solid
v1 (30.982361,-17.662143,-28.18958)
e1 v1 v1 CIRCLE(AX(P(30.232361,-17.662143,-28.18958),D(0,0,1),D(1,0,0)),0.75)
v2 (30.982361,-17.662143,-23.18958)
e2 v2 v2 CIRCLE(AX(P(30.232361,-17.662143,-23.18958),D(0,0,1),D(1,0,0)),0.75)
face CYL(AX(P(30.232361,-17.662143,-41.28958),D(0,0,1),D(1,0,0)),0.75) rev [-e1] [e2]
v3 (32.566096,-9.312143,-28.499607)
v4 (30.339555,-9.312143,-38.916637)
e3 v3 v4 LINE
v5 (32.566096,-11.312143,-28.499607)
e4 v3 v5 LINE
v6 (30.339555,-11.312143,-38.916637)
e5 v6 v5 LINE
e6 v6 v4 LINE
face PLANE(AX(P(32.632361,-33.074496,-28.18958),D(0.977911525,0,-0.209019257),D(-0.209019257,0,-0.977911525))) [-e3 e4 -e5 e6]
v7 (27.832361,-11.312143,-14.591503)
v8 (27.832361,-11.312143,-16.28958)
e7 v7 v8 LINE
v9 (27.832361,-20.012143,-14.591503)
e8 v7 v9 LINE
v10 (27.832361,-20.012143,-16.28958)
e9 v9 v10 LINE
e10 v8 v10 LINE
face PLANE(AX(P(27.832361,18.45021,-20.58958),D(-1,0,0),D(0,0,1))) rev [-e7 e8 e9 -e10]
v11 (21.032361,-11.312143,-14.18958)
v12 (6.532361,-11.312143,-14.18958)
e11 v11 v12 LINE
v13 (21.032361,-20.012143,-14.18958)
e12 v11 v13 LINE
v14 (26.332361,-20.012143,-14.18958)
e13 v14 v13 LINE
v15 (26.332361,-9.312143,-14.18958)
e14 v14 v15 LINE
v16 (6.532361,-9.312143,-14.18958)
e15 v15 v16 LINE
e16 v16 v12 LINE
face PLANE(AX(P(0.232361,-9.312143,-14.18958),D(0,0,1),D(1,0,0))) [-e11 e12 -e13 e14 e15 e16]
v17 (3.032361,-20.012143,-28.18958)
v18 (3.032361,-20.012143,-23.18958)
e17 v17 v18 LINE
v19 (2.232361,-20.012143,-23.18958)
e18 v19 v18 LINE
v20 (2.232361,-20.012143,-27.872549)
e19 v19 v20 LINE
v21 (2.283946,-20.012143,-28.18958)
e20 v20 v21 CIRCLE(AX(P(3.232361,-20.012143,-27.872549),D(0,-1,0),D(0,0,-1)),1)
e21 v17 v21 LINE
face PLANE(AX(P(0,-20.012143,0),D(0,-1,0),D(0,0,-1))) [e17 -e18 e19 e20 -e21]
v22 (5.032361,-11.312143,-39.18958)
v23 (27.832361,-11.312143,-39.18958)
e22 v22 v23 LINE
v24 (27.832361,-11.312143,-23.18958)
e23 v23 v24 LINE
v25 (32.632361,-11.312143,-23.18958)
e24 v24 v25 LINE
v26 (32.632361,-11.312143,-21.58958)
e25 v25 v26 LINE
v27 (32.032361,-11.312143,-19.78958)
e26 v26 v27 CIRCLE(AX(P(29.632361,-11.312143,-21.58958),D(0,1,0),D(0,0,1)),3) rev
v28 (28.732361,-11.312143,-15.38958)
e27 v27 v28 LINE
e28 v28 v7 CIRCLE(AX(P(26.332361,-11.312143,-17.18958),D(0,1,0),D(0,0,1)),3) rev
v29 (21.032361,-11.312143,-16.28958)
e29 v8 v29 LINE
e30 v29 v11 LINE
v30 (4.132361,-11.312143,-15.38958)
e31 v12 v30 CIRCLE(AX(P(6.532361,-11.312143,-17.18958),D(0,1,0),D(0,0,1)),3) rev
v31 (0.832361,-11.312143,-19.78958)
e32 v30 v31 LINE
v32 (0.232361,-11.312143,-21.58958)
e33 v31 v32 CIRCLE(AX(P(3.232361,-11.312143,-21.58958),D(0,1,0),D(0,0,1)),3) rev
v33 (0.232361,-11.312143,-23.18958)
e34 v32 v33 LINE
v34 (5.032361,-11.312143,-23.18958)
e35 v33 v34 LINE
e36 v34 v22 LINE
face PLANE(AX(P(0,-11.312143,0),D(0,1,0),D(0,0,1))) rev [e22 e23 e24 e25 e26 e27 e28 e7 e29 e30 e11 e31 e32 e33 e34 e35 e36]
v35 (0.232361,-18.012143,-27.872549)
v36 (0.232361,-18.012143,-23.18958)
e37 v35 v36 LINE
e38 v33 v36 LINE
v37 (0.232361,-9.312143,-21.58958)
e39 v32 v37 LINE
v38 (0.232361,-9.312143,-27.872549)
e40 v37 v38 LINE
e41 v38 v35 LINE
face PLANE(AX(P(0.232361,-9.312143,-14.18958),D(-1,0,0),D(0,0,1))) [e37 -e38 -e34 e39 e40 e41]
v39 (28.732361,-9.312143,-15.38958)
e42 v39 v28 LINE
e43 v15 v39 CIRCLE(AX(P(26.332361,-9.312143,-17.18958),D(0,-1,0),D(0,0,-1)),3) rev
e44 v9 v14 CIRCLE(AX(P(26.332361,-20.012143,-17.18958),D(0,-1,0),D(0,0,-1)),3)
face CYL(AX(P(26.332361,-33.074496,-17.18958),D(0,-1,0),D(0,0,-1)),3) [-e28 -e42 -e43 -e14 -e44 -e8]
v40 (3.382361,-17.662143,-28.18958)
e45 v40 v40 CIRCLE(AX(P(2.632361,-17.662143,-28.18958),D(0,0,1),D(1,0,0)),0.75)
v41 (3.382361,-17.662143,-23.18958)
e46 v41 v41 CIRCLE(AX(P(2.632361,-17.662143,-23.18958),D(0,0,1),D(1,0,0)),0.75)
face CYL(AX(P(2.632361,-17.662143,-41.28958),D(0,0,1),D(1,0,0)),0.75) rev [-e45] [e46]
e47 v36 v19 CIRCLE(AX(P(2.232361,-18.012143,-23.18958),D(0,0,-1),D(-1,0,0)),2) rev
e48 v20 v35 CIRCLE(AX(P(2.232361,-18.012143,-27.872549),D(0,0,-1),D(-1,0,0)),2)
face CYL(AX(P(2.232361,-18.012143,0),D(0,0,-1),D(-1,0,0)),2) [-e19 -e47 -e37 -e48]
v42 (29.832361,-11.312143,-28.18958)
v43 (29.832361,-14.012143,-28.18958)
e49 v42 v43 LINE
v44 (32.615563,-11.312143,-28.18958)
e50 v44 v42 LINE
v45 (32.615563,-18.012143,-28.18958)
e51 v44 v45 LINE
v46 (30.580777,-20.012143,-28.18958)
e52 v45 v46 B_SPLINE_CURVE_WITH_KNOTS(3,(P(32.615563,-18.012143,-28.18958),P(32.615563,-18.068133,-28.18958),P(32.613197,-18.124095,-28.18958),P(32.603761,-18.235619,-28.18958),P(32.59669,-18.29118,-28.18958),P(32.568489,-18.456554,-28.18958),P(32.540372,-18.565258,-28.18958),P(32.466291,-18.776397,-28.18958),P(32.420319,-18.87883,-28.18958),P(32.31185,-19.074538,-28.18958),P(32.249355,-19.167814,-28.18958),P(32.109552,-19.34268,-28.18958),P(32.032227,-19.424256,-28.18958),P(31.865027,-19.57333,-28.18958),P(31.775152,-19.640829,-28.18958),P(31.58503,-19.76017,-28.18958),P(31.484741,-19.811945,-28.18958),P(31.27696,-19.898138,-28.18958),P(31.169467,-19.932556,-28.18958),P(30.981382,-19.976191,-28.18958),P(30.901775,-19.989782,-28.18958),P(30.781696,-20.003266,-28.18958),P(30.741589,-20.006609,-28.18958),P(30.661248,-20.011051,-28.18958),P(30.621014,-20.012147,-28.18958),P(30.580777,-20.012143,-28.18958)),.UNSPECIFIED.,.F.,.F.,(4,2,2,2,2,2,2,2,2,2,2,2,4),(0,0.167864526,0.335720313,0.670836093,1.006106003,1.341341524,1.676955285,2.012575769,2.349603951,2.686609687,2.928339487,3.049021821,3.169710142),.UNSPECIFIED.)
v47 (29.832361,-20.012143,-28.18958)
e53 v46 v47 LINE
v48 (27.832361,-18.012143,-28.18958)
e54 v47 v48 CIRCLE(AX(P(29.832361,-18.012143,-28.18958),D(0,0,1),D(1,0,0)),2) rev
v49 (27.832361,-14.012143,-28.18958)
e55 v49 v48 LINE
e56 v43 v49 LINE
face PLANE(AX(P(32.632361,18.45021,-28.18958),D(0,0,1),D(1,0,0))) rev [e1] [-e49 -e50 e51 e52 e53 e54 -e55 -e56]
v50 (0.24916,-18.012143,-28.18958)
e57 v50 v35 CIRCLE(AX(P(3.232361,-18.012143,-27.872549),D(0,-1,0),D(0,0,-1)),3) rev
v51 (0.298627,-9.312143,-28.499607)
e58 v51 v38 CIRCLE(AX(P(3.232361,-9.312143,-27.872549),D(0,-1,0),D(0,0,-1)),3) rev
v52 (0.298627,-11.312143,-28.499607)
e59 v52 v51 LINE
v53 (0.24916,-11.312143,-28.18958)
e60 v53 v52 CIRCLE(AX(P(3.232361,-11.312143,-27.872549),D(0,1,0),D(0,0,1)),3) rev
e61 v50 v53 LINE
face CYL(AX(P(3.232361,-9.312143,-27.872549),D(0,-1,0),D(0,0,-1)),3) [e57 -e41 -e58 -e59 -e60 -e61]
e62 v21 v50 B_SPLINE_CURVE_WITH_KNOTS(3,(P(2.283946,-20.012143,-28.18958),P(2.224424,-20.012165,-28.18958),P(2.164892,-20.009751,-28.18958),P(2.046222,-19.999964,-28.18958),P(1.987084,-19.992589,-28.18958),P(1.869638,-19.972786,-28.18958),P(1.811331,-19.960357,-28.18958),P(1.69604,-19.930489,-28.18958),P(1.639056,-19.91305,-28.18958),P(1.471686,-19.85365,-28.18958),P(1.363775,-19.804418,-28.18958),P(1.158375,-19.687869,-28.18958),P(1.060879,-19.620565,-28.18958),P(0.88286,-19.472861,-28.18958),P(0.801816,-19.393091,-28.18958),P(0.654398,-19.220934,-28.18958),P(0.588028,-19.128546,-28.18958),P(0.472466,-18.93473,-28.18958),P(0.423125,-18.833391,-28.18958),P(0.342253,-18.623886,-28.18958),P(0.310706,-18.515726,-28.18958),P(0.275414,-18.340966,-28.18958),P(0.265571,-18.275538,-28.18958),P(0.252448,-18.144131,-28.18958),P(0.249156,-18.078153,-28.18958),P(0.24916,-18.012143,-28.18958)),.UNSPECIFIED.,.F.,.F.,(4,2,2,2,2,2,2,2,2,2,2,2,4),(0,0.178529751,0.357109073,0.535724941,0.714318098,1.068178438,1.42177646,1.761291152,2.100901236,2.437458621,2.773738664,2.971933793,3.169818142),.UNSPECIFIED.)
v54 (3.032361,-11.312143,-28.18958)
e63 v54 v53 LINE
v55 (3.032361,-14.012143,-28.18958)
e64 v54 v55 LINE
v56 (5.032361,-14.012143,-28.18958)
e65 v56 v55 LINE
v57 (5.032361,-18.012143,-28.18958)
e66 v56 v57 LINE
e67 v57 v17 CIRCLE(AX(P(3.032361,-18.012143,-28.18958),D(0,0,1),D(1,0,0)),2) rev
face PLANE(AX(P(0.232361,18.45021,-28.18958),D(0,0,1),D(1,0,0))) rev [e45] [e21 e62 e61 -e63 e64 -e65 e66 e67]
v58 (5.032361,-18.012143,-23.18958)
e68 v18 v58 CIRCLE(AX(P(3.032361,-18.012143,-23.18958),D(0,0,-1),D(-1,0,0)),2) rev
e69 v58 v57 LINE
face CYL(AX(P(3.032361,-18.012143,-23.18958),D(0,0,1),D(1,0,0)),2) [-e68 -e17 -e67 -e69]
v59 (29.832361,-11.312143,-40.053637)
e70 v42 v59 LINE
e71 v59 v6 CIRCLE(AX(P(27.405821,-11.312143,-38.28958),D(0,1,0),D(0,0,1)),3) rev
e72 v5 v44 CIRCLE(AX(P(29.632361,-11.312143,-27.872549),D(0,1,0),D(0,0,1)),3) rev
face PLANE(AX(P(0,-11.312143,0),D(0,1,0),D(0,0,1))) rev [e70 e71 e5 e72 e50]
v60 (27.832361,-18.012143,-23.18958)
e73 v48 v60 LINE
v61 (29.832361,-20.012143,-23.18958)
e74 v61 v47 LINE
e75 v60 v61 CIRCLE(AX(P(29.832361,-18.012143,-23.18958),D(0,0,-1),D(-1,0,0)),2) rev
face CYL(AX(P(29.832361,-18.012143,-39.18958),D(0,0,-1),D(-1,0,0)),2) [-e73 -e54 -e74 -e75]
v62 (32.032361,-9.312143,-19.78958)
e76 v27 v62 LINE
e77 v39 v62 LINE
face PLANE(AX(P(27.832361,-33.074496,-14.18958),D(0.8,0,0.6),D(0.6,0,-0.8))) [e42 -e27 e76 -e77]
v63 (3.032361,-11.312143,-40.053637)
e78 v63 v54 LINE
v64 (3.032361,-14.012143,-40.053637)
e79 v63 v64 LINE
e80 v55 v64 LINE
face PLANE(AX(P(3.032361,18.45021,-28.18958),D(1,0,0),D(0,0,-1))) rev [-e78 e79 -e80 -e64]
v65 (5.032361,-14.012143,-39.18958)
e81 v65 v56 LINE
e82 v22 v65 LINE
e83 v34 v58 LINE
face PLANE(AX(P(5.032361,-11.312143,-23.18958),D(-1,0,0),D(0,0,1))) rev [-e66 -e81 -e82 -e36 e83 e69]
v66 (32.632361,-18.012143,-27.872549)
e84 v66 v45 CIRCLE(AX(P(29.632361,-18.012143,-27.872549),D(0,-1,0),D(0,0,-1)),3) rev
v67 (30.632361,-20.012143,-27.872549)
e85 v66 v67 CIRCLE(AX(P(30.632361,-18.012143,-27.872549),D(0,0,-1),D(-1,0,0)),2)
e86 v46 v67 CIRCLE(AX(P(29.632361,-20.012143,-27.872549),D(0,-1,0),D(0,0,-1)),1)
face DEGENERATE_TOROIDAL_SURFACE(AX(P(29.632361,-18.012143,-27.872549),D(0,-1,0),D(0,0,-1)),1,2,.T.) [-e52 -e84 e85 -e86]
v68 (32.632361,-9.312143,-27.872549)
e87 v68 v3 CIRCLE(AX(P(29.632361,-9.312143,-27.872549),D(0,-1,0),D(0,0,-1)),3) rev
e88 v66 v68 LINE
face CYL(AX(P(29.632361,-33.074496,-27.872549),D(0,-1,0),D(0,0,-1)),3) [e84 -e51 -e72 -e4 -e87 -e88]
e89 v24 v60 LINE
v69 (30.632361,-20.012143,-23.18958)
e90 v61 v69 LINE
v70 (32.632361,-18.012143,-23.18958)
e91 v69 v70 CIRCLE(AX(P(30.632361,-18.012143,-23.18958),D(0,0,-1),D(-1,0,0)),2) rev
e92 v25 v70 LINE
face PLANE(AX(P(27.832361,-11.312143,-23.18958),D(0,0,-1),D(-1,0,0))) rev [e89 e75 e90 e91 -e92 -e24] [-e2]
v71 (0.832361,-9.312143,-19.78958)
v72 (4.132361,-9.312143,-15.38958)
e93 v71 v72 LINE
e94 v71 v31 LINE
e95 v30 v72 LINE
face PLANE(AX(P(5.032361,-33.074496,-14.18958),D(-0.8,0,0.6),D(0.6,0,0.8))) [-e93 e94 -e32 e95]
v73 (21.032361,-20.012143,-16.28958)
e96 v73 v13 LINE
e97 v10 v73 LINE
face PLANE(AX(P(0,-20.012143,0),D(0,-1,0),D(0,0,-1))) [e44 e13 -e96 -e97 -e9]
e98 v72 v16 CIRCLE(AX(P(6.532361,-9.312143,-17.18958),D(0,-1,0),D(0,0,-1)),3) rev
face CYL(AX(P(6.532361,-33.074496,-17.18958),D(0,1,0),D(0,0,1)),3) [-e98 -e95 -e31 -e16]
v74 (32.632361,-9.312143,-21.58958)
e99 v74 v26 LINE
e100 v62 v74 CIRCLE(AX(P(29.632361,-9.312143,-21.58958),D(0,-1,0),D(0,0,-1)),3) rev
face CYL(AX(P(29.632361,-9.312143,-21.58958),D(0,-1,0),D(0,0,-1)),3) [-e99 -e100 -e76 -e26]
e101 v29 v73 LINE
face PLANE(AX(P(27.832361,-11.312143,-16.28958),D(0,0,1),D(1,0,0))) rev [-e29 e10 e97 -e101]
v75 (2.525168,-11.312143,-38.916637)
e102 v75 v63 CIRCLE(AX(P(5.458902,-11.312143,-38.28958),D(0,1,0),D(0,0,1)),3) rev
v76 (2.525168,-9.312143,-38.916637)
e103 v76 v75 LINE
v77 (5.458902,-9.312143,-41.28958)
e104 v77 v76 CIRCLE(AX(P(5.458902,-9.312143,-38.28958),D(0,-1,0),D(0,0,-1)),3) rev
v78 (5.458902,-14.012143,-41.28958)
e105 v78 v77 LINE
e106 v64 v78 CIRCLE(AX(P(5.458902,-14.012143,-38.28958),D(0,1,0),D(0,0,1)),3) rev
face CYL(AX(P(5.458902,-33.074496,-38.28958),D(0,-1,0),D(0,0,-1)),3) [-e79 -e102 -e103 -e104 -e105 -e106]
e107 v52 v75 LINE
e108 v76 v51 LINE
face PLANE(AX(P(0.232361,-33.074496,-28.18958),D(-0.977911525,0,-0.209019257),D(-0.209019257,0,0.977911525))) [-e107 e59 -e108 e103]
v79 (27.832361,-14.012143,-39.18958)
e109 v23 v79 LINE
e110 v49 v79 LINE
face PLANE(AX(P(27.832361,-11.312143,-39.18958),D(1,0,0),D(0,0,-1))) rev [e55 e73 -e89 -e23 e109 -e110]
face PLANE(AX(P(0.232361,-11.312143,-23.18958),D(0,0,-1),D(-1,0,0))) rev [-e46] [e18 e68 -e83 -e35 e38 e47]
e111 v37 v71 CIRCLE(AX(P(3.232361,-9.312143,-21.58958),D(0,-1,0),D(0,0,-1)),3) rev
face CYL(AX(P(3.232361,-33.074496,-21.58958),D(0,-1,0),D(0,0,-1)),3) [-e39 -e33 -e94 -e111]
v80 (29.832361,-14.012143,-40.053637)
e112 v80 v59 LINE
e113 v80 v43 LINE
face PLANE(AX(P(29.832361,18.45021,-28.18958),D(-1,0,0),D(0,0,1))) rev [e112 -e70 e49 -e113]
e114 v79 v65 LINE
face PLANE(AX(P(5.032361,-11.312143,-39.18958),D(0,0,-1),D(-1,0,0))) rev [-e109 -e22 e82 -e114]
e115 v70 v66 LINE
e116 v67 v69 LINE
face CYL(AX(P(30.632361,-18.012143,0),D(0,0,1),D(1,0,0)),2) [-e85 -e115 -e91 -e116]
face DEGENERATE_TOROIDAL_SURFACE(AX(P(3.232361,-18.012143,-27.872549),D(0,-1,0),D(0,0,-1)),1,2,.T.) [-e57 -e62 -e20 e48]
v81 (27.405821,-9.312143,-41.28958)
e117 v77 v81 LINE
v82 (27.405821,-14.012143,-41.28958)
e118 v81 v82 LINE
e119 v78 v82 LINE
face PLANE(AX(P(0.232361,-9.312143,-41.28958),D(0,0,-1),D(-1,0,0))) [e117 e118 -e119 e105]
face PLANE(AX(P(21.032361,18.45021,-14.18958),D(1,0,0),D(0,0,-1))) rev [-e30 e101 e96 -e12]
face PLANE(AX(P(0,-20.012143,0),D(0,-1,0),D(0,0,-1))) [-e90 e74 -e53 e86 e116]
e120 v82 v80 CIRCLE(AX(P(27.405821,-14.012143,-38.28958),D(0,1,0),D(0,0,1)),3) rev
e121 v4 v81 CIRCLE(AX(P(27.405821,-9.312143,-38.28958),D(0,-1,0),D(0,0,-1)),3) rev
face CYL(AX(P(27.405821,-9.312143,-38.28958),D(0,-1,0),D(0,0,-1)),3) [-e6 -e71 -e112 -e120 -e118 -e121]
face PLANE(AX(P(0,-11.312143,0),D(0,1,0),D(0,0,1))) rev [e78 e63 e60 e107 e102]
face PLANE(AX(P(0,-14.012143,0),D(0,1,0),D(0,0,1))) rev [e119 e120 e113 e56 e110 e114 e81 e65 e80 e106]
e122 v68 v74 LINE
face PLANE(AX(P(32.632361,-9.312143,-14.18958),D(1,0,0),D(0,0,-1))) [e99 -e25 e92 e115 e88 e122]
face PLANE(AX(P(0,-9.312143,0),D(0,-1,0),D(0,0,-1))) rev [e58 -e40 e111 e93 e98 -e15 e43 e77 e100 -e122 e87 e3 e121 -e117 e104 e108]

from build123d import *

# Parameters (mm, degrees)
BOSS_EXTRUDE1_START     = -14.7
BOSS_EXTRUDE1_OUTLINE_W = 32.4
BOSS_EXTRUDE1_OUTLINE_H = 27.1
BOSS_EXTRUDE1_DEPTH     = 14.7
CUT_EXTRUDE1_DEPTH      = 12.7
MOVE_FACE1_BY           = 4
MOVE_FACE1_2_BY         = 4
SKETCH3_W               = 2.8
SKETCH3_H               = 13.1
CUT_EXTRUDE2_DEPTH      = 13.7
CUT_EXTRUDE3_DEPTH      = 6
SKETCH5_R               = 0.75
CUT_EXTRUDE4_DEPTH      = 43.343439739
BOSS_EXTRUDE2_DEPTH     = 2
FILLET1_R               = 3
FILLET2_R               = 3
FILLET3_START           = -21
FILLET3_DEPTH           = 13
FILLET4_START           = -21
FILLET4_DEPTH           = 13
FILLET5_R               = 3
FILLET6_R               = 3
FILLET7_R               = 2


with BuildPart() as part:
    # Boss-Extrude1: read off the stored shape, not the designer's step
    # Boss-Extrude1 outline → Boss-Extrude1 (new body)
    with BuildSketch(Plane.XZ.offset(24.012143299).offset(BOSS_EXTRUDE1_START)):
        with Locations((16.432361385, -27.739579566)):
            Rectangle(BOSS_EXTRUDE1_OUTLINE_W, BOSS_EXTRUDE1_OUTLINE_H)
    extrude(amount=BOSS_EXTRUDE1_DEPTH)

    # Sketch2 → Cut-Extrude1 (cut)
    with BuildSketch(Plane.XZ.offset(24.012143299)):
        Polygon((27.832361385, -23.189579566), (32.632361385, -23.189579566), (32.632361385, -20.589579566), (27.832361385, -20.589579566), (27.832361385, -16.289579566), (5.032361385, -16.289579566), (5.032361385, -20.589579566), (0.232361385, -20.589579566), (0.232361385, -23.189579566), (5.032361385, -23.189579566), (5.032361385, -39.189579566), (27.832361385, -39.189579566), align=None)
    extrude(amount=-CUT_EXTRUDE1_DEPTH, mode=Mode.SUBTRACT)

    # Move Face1: a face moved inward by 4.0
    extrude(part.faces().sort_by_distance((16.432361385, -24.012143299, -39.479579566))[0], amount=MOVE_FACE1_BY, dir=(0, 1, 0), mode=Mode.SUBTRACT)

    # Move Face1 2: a face moved inward by 4.0
    extrude(part.faces().sort_by_distance((16.432361385, -24.012143299, -15.789579566))[0], amount=MOVE_FACE1_2_BY, dir=(0, 1, 0), mode=Mode.SUBTRACT)

    # Sketch3 → Cut-Extrude2 (cut)
    with BuildSketch(Plane.XZ.offset(20.012143299)):
        with Locations((1.632361385, -34.739579566)):
            Rectangle(SKETCH3_W, SKETCH3_H)
        with Locations((31.232361385, -34.739579566)):
            Rectangle(SKETCH3_W, SKETCH3_H)
        Polygon((0.232361385, -20.589579566), (5.032361385, -20.589579566), (5.032361385, -16.289579566), (21.032361385, -16.289579566), (21.032361385, -14.189579566), (0.232361385, -14.189579566), align=None)
        Polygon((27.832361385, -14.189579566), (32.632361385, -14.189579566), (32.632361385, -20.589579566), (27.832361385, -20.589579566), (27.832361385, -16.289579566), align=None)
    extrude(amount=-CUT_EXTRUDE2_DEPTH, mode=Mode.SUBTRACT)

    # Sketch4 → Cut-Extrude3 (cut)
    with BuildSketch(Plane.XZ.offset(20.012143299)):
        Polygon((3.032361385, -28.189579566), (5.032361385, -28.189579566), (5.032361385, -39.189579566), (27.832361385, -39.189579566), (27.832361385, -28.189579566), (29.832361385, -28.189579566), (29.832361385, -41.289579566), (3.032361385, -41.289579566), align=None)
    extrude(amount=-CUT_EXTRUDE3_DEPTH, mode=Mode.SUBTRACT)

    # Sketch5 → Cut-Extrude4 (cut, through all)
    with BuildSketch(Plane.XY.offset(-23.189579566)):
        with Locations((2.632361385, -17.662143299)):
            Circle(SKETCH5_R)
        with Locations((30.232361385, -17.662143299)):
            Circle(SKETCH5_R)
    extrude(amount=-CUT_EXTRUDE4_DEPTH, mode=Mode.SUBTRACT)

    # Sketch6 → Boss-Extrude2 (add)
    with BuildSketch(Plane(origin=(0, -9.312143299, 0), x_dir=(1, 0, 0), z_dir=(0, 1, 0))):
        Polygon((21.032361385, 14.189579566), (5.032361385, 14.189579566), (0.232361385, 20.589579566), (5.032361385, 20.589579566), (5.032361385, 16.289579566), (21.032361385, 16.289579566), align=None)
        Polygon((0.232361385, 28.189579566), (3.032361385, 41.289579566), (3.032361385, 28.189579566), align=None)
        Polygon((29.832361385, 41.289579566), (29.832361385, 28.189579566), (32.632361385, 28.189579566), align=None)
        Polygon((27.832361385, 20.589579566), (27.832361385, 14.189579566), (32.632361385, 20.589579566), align=None)
    extrude(amount=-BOSS_EXTRUDE2_DEPTH)

    # Fillet1
    # the kernel refuses this fillet: 3 mm, written as the material it takes off along each edge
    with BuildSketch(Plane(origin=(29.832361385, -17.378495337, -41.289579566), x_dir=(0.20901925718607187, 0, 0.9779115246919747), z_dir=(0, 1, 0))) as fillet1_piece_1:
        with BuildLine():
            CenterArc((FILLET1_R * 0.808846938434, -FILLET1_R), FILLET1_R, 90, 77.935115589)
            Line((-FILLET1_R * 0.169064586258, -FILLET1_R * 0.790980742814), (0, 0))
            Line((0, 0), (FILLET1_R * 0.808846938434, 0))
        make_face()
    extrude(amount=14.132704077, mode=Mode.SUBTRACT)

    # Fillet2
    # the kernel refuses this fillet: 3 mm, written as the material it takes off along each edge
    with BuildSketch(Plane(origin=(3.032361385, -17.378495337, -41.289579566), x_dir=(1.0, 0, -8.828560948914946e-12), z_dir=(0, 1, 0))) as fillet2_piece_1:
        with BuildLine():
            CenterArc((FILLET2_R * 0.808846938434, -FILLET2_R), FILLET2_R, 89.999999999, 77.935115589)
            Line((-FILLET2_R * 0.169064586256, -FILLET2_R * 0.790980742805), (0, 0))
            Line((0, 0), (FILLET2_R * 0.808846938443, 0))
        make_face()
    extrude(amount=14.132704077, mode=Mode.SUBTRACT)

    # Fillet3: read off the stored shape, not the designer's step
    # Fillet3 outline → Fillet3 (cut)
    with BuildSketch(Plane(origin=(0, 0, 0), x_dir=(1, 0, 0), z_dir=(0, 1, 0)).offset(FILLET3_START)):
        with BuildLine():
            Line((0.232361385, 28.189579566), (0.232361385, 27.872549323))
            ThreePointArc((0.232361385, 27.872549323), (0.248973736, 28.187824027), (0.29862681, 28.499607094))
            Line((0.29862681, 28.499607094), (0.232361385, 28.189579566))
        make_face()
    extrude(amount=FILLET3_DEPTH, mode=Mode.SUBTRACT)

    # Fillet4: read off the stored shape, not the designer's step
    # Fillet4 outline → Fillet4 (cut)
    with BuildSketch(Plane(origin=(0, 0, 0), x_dir=(1, 0, 0), z_dir=(0, 1, 0)).offset(FILLET4_START)):
        with BuildLine():
            Line((32.632361385, 28.189579566), (32.566095959, 28.499607094))
            ThreePointArc((32.566095959, 28.499607094), (32.615749033, 28.187824027), (32.632361385, 27.872549323))
            Line((32.632361385, 27.872549323), (32.632361385, 28.189579566))
        make_face()
    extrude(amount=FILLET4_DEPTH, mode=Mode.SUBTRACT)

    # Fillet5
    fillet5_edges = [part.edges().sort_by_distance(p)[0] for p in [
        (32.632361385, -10.312143299, -20.589579566),
        (5.032361385, -10.312143299, -14.189579566),
        (0.232361385, -10.312143299, -20.589579566),
    ]]
    fillet(fillet5_edges, radius=FILLET5_R)

    # Fillet6
    # the kernel refuses this fillet: 3 mm, written as the material it takes off along each edge
    with BuildSketch(Plane(origin=(27.832361385, -20.312143299, -14.189579566), x_dir=(-1.0, 0, -1.4283093226823923e-11), z_dir=(0, 1, 0))) as fillet6_piece_1:
        with BuildLine():
            CenterArc((FILLET6_R * 0.500000000009, -FILLET6_R), FILLET6_R, 90.000000001, 53.130102354)
            Line((-FILLET6_R * 0.3, -FILLET6_R * 0.400000000011), (-FILLET6_R * 0.316, -FILLET6_R * 0.388000000012))
            Line((-FILLET6_R * 0.316, -FILLET6_R * 0.388000000012), (-FILLET6_R * 0.0100000000003, FILLET6_R * 0.0199999999999))
            Line((-FILLET6_R * 0.0100000000003, FILLET6_R * 0.0199999999999), (FILLET6_R * 0.499999999994, FILLET6_R * 0.02))
            Line((FILLET6_R * 0.499999999994, FILLET6_R * 0.02), (FILLET6_R * 0.499999999995, 0))
        make_face()
    extrude(amount=20, mode=Mode.SUBTRACT)

    # Fillet7
    fillet7_edges = [part.edges().sort_by_distance(p)[0] for p in [
        (0.232361385, -20.012143299, -25.531064444),
        (27.832361385, -20.012143299, -25.689579566),
        (0.236563927, -20.012143299, -28.031286811),
        (32.632361385, -20.012143299, -25.531064444),
        (32.628158843, -20.012143299, -28.031286811),
        (5.032361385, -20.012143299, -25.689579566),
    ]]
    fillet(fillet7_edges, radius=FILLET7_R)


solid = part.part
